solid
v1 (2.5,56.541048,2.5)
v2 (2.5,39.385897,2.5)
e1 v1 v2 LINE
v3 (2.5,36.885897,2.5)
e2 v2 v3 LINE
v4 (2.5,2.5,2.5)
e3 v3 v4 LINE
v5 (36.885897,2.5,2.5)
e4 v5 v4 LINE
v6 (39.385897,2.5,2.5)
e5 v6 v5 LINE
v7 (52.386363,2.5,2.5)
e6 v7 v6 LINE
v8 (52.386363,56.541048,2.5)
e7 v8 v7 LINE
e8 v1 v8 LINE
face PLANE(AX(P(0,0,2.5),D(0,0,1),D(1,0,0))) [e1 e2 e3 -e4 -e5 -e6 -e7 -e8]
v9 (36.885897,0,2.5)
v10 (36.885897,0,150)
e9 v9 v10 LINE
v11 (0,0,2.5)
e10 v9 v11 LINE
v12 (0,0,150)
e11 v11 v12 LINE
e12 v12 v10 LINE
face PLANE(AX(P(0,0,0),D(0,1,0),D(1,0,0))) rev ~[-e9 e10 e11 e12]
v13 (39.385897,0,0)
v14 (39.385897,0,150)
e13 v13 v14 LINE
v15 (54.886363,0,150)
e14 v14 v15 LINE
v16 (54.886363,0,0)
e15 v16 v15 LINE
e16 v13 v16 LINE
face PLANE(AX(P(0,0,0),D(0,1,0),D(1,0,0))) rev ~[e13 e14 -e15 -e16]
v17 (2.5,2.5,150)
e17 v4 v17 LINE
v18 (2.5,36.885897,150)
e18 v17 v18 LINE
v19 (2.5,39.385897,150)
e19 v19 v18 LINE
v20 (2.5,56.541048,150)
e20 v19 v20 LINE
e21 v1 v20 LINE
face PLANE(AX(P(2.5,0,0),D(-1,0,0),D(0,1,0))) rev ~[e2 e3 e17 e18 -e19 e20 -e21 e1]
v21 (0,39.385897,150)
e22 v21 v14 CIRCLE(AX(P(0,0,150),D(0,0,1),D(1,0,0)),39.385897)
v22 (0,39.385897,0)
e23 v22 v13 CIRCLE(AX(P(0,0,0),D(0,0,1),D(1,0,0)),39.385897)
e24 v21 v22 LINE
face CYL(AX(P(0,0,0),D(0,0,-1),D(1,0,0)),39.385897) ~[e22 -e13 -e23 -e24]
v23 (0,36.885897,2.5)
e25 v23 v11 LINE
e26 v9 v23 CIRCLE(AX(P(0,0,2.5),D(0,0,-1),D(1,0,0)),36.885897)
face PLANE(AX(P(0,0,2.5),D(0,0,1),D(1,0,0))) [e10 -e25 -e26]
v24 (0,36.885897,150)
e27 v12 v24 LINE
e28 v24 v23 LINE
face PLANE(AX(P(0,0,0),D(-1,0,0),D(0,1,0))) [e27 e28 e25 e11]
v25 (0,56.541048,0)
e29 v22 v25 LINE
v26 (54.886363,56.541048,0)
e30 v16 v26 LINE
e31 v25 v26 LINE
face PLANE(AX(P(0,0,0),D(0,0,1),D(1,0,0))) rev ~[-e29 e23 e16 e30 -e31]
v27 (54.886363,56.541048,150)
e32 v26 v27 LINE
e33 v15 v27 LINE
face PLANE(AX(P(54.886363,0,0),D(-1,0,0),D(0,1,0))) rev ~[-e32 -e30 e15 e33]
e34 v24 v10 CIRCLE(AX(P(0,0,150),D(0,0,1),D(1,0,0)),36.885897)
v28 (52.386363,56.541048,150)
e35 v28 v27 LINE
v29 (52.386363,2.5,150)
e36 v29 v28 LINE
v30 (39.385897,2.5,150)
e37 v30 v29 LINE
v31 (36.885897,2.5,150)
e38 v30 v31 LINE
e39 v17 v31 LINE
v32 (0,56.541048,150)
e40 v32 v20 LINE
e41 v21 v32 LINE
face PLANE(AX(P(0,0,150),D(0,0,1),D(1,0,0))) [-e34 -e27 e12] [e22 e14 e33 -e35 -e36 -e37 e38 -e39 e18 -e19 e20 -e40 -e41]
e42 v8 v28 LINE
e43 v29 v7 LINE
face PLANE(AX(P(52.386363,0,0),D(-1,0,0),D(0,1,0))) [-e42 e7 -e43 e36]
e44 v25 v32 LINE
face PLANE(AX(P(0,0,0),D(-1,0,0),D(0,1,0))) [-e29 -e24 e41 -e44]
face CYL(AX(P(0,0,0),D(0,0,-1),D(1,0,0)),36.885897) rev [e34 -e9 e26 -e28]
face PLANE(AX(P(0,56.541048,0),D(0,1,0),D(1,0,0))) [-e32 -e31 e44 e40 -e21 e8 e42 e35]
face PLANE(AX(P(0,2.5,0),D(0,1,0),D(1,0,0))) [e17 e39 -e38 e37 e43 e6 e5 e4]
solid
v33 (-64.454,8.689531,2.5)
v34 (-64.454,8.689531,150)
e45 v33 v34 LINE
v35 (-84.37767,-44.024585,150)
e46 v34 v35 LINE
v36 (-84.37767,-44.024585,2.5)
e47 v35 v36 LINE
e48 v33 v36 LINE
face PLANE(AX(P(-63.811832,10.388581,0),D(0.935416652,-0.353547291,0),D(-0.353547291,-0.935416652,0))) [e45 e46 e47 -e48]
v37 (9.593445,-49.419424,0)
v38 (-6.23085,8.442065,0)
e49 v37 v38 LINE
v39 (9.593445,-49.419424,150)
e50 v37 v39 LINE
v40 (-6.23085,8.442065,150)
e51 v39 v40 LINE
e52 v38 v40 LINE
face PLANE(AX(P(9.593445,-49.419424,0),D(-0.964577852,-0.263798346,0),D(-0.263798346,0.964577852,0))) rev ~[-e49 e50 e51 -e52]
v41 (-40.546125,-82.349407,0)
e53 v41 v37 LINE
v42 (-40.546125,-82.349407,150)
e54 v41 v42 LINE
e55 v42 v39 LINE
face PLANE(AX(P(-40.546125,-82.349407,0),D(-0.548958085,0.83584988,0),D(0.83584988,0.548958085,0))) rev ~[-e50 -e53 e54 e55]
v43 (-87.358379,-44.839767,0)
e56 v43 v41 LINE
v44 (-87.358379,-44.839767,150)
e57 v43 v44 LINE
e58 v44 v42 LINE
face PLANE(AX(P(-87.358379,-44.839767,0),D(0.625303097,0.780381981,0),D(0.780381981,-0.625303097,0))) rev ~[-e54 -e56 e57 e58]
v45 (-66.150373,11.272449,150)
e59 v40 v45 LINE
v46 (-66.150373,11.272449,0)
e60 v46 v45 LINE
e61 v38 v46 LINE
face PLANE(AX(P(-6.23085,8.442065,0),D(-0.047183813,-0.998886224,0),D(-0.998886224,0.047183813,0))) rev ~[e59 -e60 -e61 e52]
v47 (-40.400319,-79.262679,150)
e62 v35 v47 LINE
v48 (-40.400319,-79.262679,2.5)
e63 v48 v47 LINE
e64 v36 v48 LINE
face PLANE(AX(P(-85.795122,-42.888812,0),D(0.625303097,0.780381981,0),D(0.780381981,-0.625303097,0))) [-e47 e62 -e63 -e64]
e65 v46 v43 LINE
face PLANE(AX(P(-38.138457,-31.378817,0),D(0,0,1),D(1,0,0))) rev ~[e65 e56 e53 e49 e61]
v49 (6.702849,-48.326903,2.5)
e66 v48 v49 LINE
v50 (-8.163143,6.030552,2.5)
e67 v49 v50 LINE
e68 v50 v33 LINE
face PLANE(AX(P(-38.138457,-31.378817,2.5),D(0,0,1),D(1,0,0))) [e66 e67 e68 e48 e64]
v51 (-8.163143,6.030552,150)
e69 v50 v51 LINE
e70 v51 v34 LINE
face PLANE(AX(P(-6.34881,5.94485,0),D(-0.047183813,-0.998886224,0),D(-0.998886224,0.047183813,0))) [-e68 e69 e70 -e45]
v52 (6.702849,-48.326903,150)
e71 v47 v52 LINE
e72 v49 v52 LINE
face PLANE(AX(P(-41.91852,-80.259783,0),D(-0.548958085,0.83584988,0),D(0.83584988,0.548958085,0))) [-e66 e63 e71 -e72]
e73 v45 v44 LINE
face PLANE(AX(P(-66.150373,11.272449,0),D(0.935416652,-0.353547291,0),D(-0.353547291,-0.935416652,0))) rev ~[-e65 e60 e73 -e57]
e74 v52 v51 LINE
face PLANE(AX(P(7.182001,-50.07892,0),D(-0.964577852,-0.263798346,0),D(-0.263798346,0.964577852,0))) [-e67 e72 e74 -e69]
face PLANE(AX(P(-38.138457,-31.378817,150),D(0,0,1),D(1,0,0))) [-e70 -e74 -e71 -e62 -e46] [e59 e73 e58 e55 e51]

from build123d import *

# Parameters (mm, degrees)
F0_R         = 39.3858974646
F1_DEPTH     = 150
F2_T         = -2.5
F3_W         = 54.8863634467
F3_H         = 56.5410479903
F4_DEPTH     = 150
F5_T         = 2.5
F5_T3_DEPTH  = 155
F5_T5_DEPTH  = 152.5
F5_T7_DEPTH  = 41.8858974646
F5_T9_DEPTH  = 41.8858974646
F5_T12_ANGLE = 270.000000001
F7_DEPTH     = 150
F8_T         = -2.5


# Not quite as in the source:
# - a shell that OpenCascade refuses in one call is made with other operations: the cavity is built on its own and cut out


with BuildPart() as f1:
    # F0 (on Top) → F1 (new body)
    with BuildSketch(Plane.XY):
        Circle(F0_R)
    extrude(amount=F1_DEPTH)

    # F2
    f2_openings = [f1.faces().sort_by_distance(p)[0] for p in [
        (0, 0, 150),
    ]]
    offset(amount=F2_T, openings=f2_openings)

    # F3 (on Top) → F4 (join)
    with BuildSketch(Plane.XY):
        with Locations((27.4431817234, 28.2705239952)):
            Rectangle(F3_W, F3_H)
    extrude(amount=F4_DEPTH)

    # F5: shell of thickness 2.5, made by hand


with BuildPart() as f5_core1:
    # F5_t2: copy of F1
    add(f1.part)

    # the walls: a layer under each face that stays
    f5_faces = [f5_core1.faces().sort_by_distance(p)[0] for p in [
        (7.7502329911, 8.5775752629, 0),
        (-27.8500351803, -27.8500351803, 75),
        (54.8863634467, 28.2705239952, 75),
        (47.1361304556, 0, 75),
        (0, 47.9634727274, 75),
        (-26.0822682274, -26.0822682273, 76.25),
        (18.4429487323, 0, 76.25),
        (0, 18.4429487323, 76.25),
        (-24.5905983097, -24.5905983097, 2.5),
    ]]
    thicken(f5_faces, amount=-F5_T, mode=Mode.SUBTRACT)

    # F5_s4 → F5_t3 (cut)
    with BuildSketch(Plane.XY.offset(-2.5)):
        Polygon((39.4108974646, -0.025), (36.8858974646, 0), (36.8858974646, 2.5), (39.3858974646, 2.5), align=None)
        Polygon((-0.025, 39.4108974646), (0, 36.8858974646), (2.5, 36.8858974646), (2.5, 39.3858974646), align=None)
    extrude(amount=F5_T3_DEPTH, mode=Mode.SUBTRACT)

    # F5_s6 → F5_t5 (cut)
    with BuildSketch(Plane.XY):
        Polygon((36.8608974646, -0.025), (39.3858974646, 0), (39.3858974646, 2.5), (36.8858974646, 2.5), align=None)
        Polygon((-0.025, 36.8608974646), (0, 39.3858974646), (2.5, 39.3858974646), (2.5, 36.8858974646), align=None)
    extrude(amount=F5_T5_DEPTH, mode=Mode.SUBTRACT)

    # F5_s8 → F5_t7 (cut)
    with BuildSketch(Plane.YZ.offset(-2.5)):
        Polygon((-0.025, 2.525), (2.5, 2.5), (2.5, 0), (0, 0), align=None)
    extrude(amount=F5_T7_DEPTH, mode=Mode.SUBTRACT)

    # F5_s10 → F5_t9 (cut)
    with BuildSketch(Plane.XZ.offset(-39.3858974646)):
        Polygon((-0.025, 2.525), (2.5, 2.5), (2.5, 0), (0, 0), align=None)
    extrude(amount=F5_T9_DEPTH, mode=Mode.SUBTRACT)

    # F5_s11 → F5_t12 (revolve, cut)
    with BuildSketch(Plane.XZ):
        Polygon((36.8608974646, 2.525), (39.3858974646, 2.5), (39.3858974646, 0), (36.8858974646, 0), align=None)
    revolve(axis=Axis((0, 0, 2.5), (0, 0, -1)), revolution_arc=F5_T12_ANGLE, mode=Mode.SUBTRACT)


with BuildPart() as f1_1:
    add(f1.part)

    # what is left inside the walls is the cavity
    f5_cavity = [f5_core1.part.solids().sort_by_distance(p)[0] for p in [
        (52.361363, 29.520524, 100.833333),
    ]]
    add(f5_cavity, mode=Mode.SUBTRACT)


with BuildPart() as f7:
    # F6 (on Top) → F7 (new body)
    with BuildSketch(Plane.XY):
        Polygon((-87.3583794889, -44.8397668156), (-40.5461250487, -82.3494074789), (9.5934452951, -49.4194242689), (-6.2308504914, 8.4420652671), (-66.1503734792, 11.2724492301), align=None)
    extrude(amount=F7_DEPTH)

    # F8
    f8_openings = [f7.faces().sort_by_distance(p)[0] for p in [
        (-38.138457, -31.378817, 150),
    ]]
    offset(amount=F8_T, openings=f8_openings)


solid = Compound([f1_1.part, f7.part])
